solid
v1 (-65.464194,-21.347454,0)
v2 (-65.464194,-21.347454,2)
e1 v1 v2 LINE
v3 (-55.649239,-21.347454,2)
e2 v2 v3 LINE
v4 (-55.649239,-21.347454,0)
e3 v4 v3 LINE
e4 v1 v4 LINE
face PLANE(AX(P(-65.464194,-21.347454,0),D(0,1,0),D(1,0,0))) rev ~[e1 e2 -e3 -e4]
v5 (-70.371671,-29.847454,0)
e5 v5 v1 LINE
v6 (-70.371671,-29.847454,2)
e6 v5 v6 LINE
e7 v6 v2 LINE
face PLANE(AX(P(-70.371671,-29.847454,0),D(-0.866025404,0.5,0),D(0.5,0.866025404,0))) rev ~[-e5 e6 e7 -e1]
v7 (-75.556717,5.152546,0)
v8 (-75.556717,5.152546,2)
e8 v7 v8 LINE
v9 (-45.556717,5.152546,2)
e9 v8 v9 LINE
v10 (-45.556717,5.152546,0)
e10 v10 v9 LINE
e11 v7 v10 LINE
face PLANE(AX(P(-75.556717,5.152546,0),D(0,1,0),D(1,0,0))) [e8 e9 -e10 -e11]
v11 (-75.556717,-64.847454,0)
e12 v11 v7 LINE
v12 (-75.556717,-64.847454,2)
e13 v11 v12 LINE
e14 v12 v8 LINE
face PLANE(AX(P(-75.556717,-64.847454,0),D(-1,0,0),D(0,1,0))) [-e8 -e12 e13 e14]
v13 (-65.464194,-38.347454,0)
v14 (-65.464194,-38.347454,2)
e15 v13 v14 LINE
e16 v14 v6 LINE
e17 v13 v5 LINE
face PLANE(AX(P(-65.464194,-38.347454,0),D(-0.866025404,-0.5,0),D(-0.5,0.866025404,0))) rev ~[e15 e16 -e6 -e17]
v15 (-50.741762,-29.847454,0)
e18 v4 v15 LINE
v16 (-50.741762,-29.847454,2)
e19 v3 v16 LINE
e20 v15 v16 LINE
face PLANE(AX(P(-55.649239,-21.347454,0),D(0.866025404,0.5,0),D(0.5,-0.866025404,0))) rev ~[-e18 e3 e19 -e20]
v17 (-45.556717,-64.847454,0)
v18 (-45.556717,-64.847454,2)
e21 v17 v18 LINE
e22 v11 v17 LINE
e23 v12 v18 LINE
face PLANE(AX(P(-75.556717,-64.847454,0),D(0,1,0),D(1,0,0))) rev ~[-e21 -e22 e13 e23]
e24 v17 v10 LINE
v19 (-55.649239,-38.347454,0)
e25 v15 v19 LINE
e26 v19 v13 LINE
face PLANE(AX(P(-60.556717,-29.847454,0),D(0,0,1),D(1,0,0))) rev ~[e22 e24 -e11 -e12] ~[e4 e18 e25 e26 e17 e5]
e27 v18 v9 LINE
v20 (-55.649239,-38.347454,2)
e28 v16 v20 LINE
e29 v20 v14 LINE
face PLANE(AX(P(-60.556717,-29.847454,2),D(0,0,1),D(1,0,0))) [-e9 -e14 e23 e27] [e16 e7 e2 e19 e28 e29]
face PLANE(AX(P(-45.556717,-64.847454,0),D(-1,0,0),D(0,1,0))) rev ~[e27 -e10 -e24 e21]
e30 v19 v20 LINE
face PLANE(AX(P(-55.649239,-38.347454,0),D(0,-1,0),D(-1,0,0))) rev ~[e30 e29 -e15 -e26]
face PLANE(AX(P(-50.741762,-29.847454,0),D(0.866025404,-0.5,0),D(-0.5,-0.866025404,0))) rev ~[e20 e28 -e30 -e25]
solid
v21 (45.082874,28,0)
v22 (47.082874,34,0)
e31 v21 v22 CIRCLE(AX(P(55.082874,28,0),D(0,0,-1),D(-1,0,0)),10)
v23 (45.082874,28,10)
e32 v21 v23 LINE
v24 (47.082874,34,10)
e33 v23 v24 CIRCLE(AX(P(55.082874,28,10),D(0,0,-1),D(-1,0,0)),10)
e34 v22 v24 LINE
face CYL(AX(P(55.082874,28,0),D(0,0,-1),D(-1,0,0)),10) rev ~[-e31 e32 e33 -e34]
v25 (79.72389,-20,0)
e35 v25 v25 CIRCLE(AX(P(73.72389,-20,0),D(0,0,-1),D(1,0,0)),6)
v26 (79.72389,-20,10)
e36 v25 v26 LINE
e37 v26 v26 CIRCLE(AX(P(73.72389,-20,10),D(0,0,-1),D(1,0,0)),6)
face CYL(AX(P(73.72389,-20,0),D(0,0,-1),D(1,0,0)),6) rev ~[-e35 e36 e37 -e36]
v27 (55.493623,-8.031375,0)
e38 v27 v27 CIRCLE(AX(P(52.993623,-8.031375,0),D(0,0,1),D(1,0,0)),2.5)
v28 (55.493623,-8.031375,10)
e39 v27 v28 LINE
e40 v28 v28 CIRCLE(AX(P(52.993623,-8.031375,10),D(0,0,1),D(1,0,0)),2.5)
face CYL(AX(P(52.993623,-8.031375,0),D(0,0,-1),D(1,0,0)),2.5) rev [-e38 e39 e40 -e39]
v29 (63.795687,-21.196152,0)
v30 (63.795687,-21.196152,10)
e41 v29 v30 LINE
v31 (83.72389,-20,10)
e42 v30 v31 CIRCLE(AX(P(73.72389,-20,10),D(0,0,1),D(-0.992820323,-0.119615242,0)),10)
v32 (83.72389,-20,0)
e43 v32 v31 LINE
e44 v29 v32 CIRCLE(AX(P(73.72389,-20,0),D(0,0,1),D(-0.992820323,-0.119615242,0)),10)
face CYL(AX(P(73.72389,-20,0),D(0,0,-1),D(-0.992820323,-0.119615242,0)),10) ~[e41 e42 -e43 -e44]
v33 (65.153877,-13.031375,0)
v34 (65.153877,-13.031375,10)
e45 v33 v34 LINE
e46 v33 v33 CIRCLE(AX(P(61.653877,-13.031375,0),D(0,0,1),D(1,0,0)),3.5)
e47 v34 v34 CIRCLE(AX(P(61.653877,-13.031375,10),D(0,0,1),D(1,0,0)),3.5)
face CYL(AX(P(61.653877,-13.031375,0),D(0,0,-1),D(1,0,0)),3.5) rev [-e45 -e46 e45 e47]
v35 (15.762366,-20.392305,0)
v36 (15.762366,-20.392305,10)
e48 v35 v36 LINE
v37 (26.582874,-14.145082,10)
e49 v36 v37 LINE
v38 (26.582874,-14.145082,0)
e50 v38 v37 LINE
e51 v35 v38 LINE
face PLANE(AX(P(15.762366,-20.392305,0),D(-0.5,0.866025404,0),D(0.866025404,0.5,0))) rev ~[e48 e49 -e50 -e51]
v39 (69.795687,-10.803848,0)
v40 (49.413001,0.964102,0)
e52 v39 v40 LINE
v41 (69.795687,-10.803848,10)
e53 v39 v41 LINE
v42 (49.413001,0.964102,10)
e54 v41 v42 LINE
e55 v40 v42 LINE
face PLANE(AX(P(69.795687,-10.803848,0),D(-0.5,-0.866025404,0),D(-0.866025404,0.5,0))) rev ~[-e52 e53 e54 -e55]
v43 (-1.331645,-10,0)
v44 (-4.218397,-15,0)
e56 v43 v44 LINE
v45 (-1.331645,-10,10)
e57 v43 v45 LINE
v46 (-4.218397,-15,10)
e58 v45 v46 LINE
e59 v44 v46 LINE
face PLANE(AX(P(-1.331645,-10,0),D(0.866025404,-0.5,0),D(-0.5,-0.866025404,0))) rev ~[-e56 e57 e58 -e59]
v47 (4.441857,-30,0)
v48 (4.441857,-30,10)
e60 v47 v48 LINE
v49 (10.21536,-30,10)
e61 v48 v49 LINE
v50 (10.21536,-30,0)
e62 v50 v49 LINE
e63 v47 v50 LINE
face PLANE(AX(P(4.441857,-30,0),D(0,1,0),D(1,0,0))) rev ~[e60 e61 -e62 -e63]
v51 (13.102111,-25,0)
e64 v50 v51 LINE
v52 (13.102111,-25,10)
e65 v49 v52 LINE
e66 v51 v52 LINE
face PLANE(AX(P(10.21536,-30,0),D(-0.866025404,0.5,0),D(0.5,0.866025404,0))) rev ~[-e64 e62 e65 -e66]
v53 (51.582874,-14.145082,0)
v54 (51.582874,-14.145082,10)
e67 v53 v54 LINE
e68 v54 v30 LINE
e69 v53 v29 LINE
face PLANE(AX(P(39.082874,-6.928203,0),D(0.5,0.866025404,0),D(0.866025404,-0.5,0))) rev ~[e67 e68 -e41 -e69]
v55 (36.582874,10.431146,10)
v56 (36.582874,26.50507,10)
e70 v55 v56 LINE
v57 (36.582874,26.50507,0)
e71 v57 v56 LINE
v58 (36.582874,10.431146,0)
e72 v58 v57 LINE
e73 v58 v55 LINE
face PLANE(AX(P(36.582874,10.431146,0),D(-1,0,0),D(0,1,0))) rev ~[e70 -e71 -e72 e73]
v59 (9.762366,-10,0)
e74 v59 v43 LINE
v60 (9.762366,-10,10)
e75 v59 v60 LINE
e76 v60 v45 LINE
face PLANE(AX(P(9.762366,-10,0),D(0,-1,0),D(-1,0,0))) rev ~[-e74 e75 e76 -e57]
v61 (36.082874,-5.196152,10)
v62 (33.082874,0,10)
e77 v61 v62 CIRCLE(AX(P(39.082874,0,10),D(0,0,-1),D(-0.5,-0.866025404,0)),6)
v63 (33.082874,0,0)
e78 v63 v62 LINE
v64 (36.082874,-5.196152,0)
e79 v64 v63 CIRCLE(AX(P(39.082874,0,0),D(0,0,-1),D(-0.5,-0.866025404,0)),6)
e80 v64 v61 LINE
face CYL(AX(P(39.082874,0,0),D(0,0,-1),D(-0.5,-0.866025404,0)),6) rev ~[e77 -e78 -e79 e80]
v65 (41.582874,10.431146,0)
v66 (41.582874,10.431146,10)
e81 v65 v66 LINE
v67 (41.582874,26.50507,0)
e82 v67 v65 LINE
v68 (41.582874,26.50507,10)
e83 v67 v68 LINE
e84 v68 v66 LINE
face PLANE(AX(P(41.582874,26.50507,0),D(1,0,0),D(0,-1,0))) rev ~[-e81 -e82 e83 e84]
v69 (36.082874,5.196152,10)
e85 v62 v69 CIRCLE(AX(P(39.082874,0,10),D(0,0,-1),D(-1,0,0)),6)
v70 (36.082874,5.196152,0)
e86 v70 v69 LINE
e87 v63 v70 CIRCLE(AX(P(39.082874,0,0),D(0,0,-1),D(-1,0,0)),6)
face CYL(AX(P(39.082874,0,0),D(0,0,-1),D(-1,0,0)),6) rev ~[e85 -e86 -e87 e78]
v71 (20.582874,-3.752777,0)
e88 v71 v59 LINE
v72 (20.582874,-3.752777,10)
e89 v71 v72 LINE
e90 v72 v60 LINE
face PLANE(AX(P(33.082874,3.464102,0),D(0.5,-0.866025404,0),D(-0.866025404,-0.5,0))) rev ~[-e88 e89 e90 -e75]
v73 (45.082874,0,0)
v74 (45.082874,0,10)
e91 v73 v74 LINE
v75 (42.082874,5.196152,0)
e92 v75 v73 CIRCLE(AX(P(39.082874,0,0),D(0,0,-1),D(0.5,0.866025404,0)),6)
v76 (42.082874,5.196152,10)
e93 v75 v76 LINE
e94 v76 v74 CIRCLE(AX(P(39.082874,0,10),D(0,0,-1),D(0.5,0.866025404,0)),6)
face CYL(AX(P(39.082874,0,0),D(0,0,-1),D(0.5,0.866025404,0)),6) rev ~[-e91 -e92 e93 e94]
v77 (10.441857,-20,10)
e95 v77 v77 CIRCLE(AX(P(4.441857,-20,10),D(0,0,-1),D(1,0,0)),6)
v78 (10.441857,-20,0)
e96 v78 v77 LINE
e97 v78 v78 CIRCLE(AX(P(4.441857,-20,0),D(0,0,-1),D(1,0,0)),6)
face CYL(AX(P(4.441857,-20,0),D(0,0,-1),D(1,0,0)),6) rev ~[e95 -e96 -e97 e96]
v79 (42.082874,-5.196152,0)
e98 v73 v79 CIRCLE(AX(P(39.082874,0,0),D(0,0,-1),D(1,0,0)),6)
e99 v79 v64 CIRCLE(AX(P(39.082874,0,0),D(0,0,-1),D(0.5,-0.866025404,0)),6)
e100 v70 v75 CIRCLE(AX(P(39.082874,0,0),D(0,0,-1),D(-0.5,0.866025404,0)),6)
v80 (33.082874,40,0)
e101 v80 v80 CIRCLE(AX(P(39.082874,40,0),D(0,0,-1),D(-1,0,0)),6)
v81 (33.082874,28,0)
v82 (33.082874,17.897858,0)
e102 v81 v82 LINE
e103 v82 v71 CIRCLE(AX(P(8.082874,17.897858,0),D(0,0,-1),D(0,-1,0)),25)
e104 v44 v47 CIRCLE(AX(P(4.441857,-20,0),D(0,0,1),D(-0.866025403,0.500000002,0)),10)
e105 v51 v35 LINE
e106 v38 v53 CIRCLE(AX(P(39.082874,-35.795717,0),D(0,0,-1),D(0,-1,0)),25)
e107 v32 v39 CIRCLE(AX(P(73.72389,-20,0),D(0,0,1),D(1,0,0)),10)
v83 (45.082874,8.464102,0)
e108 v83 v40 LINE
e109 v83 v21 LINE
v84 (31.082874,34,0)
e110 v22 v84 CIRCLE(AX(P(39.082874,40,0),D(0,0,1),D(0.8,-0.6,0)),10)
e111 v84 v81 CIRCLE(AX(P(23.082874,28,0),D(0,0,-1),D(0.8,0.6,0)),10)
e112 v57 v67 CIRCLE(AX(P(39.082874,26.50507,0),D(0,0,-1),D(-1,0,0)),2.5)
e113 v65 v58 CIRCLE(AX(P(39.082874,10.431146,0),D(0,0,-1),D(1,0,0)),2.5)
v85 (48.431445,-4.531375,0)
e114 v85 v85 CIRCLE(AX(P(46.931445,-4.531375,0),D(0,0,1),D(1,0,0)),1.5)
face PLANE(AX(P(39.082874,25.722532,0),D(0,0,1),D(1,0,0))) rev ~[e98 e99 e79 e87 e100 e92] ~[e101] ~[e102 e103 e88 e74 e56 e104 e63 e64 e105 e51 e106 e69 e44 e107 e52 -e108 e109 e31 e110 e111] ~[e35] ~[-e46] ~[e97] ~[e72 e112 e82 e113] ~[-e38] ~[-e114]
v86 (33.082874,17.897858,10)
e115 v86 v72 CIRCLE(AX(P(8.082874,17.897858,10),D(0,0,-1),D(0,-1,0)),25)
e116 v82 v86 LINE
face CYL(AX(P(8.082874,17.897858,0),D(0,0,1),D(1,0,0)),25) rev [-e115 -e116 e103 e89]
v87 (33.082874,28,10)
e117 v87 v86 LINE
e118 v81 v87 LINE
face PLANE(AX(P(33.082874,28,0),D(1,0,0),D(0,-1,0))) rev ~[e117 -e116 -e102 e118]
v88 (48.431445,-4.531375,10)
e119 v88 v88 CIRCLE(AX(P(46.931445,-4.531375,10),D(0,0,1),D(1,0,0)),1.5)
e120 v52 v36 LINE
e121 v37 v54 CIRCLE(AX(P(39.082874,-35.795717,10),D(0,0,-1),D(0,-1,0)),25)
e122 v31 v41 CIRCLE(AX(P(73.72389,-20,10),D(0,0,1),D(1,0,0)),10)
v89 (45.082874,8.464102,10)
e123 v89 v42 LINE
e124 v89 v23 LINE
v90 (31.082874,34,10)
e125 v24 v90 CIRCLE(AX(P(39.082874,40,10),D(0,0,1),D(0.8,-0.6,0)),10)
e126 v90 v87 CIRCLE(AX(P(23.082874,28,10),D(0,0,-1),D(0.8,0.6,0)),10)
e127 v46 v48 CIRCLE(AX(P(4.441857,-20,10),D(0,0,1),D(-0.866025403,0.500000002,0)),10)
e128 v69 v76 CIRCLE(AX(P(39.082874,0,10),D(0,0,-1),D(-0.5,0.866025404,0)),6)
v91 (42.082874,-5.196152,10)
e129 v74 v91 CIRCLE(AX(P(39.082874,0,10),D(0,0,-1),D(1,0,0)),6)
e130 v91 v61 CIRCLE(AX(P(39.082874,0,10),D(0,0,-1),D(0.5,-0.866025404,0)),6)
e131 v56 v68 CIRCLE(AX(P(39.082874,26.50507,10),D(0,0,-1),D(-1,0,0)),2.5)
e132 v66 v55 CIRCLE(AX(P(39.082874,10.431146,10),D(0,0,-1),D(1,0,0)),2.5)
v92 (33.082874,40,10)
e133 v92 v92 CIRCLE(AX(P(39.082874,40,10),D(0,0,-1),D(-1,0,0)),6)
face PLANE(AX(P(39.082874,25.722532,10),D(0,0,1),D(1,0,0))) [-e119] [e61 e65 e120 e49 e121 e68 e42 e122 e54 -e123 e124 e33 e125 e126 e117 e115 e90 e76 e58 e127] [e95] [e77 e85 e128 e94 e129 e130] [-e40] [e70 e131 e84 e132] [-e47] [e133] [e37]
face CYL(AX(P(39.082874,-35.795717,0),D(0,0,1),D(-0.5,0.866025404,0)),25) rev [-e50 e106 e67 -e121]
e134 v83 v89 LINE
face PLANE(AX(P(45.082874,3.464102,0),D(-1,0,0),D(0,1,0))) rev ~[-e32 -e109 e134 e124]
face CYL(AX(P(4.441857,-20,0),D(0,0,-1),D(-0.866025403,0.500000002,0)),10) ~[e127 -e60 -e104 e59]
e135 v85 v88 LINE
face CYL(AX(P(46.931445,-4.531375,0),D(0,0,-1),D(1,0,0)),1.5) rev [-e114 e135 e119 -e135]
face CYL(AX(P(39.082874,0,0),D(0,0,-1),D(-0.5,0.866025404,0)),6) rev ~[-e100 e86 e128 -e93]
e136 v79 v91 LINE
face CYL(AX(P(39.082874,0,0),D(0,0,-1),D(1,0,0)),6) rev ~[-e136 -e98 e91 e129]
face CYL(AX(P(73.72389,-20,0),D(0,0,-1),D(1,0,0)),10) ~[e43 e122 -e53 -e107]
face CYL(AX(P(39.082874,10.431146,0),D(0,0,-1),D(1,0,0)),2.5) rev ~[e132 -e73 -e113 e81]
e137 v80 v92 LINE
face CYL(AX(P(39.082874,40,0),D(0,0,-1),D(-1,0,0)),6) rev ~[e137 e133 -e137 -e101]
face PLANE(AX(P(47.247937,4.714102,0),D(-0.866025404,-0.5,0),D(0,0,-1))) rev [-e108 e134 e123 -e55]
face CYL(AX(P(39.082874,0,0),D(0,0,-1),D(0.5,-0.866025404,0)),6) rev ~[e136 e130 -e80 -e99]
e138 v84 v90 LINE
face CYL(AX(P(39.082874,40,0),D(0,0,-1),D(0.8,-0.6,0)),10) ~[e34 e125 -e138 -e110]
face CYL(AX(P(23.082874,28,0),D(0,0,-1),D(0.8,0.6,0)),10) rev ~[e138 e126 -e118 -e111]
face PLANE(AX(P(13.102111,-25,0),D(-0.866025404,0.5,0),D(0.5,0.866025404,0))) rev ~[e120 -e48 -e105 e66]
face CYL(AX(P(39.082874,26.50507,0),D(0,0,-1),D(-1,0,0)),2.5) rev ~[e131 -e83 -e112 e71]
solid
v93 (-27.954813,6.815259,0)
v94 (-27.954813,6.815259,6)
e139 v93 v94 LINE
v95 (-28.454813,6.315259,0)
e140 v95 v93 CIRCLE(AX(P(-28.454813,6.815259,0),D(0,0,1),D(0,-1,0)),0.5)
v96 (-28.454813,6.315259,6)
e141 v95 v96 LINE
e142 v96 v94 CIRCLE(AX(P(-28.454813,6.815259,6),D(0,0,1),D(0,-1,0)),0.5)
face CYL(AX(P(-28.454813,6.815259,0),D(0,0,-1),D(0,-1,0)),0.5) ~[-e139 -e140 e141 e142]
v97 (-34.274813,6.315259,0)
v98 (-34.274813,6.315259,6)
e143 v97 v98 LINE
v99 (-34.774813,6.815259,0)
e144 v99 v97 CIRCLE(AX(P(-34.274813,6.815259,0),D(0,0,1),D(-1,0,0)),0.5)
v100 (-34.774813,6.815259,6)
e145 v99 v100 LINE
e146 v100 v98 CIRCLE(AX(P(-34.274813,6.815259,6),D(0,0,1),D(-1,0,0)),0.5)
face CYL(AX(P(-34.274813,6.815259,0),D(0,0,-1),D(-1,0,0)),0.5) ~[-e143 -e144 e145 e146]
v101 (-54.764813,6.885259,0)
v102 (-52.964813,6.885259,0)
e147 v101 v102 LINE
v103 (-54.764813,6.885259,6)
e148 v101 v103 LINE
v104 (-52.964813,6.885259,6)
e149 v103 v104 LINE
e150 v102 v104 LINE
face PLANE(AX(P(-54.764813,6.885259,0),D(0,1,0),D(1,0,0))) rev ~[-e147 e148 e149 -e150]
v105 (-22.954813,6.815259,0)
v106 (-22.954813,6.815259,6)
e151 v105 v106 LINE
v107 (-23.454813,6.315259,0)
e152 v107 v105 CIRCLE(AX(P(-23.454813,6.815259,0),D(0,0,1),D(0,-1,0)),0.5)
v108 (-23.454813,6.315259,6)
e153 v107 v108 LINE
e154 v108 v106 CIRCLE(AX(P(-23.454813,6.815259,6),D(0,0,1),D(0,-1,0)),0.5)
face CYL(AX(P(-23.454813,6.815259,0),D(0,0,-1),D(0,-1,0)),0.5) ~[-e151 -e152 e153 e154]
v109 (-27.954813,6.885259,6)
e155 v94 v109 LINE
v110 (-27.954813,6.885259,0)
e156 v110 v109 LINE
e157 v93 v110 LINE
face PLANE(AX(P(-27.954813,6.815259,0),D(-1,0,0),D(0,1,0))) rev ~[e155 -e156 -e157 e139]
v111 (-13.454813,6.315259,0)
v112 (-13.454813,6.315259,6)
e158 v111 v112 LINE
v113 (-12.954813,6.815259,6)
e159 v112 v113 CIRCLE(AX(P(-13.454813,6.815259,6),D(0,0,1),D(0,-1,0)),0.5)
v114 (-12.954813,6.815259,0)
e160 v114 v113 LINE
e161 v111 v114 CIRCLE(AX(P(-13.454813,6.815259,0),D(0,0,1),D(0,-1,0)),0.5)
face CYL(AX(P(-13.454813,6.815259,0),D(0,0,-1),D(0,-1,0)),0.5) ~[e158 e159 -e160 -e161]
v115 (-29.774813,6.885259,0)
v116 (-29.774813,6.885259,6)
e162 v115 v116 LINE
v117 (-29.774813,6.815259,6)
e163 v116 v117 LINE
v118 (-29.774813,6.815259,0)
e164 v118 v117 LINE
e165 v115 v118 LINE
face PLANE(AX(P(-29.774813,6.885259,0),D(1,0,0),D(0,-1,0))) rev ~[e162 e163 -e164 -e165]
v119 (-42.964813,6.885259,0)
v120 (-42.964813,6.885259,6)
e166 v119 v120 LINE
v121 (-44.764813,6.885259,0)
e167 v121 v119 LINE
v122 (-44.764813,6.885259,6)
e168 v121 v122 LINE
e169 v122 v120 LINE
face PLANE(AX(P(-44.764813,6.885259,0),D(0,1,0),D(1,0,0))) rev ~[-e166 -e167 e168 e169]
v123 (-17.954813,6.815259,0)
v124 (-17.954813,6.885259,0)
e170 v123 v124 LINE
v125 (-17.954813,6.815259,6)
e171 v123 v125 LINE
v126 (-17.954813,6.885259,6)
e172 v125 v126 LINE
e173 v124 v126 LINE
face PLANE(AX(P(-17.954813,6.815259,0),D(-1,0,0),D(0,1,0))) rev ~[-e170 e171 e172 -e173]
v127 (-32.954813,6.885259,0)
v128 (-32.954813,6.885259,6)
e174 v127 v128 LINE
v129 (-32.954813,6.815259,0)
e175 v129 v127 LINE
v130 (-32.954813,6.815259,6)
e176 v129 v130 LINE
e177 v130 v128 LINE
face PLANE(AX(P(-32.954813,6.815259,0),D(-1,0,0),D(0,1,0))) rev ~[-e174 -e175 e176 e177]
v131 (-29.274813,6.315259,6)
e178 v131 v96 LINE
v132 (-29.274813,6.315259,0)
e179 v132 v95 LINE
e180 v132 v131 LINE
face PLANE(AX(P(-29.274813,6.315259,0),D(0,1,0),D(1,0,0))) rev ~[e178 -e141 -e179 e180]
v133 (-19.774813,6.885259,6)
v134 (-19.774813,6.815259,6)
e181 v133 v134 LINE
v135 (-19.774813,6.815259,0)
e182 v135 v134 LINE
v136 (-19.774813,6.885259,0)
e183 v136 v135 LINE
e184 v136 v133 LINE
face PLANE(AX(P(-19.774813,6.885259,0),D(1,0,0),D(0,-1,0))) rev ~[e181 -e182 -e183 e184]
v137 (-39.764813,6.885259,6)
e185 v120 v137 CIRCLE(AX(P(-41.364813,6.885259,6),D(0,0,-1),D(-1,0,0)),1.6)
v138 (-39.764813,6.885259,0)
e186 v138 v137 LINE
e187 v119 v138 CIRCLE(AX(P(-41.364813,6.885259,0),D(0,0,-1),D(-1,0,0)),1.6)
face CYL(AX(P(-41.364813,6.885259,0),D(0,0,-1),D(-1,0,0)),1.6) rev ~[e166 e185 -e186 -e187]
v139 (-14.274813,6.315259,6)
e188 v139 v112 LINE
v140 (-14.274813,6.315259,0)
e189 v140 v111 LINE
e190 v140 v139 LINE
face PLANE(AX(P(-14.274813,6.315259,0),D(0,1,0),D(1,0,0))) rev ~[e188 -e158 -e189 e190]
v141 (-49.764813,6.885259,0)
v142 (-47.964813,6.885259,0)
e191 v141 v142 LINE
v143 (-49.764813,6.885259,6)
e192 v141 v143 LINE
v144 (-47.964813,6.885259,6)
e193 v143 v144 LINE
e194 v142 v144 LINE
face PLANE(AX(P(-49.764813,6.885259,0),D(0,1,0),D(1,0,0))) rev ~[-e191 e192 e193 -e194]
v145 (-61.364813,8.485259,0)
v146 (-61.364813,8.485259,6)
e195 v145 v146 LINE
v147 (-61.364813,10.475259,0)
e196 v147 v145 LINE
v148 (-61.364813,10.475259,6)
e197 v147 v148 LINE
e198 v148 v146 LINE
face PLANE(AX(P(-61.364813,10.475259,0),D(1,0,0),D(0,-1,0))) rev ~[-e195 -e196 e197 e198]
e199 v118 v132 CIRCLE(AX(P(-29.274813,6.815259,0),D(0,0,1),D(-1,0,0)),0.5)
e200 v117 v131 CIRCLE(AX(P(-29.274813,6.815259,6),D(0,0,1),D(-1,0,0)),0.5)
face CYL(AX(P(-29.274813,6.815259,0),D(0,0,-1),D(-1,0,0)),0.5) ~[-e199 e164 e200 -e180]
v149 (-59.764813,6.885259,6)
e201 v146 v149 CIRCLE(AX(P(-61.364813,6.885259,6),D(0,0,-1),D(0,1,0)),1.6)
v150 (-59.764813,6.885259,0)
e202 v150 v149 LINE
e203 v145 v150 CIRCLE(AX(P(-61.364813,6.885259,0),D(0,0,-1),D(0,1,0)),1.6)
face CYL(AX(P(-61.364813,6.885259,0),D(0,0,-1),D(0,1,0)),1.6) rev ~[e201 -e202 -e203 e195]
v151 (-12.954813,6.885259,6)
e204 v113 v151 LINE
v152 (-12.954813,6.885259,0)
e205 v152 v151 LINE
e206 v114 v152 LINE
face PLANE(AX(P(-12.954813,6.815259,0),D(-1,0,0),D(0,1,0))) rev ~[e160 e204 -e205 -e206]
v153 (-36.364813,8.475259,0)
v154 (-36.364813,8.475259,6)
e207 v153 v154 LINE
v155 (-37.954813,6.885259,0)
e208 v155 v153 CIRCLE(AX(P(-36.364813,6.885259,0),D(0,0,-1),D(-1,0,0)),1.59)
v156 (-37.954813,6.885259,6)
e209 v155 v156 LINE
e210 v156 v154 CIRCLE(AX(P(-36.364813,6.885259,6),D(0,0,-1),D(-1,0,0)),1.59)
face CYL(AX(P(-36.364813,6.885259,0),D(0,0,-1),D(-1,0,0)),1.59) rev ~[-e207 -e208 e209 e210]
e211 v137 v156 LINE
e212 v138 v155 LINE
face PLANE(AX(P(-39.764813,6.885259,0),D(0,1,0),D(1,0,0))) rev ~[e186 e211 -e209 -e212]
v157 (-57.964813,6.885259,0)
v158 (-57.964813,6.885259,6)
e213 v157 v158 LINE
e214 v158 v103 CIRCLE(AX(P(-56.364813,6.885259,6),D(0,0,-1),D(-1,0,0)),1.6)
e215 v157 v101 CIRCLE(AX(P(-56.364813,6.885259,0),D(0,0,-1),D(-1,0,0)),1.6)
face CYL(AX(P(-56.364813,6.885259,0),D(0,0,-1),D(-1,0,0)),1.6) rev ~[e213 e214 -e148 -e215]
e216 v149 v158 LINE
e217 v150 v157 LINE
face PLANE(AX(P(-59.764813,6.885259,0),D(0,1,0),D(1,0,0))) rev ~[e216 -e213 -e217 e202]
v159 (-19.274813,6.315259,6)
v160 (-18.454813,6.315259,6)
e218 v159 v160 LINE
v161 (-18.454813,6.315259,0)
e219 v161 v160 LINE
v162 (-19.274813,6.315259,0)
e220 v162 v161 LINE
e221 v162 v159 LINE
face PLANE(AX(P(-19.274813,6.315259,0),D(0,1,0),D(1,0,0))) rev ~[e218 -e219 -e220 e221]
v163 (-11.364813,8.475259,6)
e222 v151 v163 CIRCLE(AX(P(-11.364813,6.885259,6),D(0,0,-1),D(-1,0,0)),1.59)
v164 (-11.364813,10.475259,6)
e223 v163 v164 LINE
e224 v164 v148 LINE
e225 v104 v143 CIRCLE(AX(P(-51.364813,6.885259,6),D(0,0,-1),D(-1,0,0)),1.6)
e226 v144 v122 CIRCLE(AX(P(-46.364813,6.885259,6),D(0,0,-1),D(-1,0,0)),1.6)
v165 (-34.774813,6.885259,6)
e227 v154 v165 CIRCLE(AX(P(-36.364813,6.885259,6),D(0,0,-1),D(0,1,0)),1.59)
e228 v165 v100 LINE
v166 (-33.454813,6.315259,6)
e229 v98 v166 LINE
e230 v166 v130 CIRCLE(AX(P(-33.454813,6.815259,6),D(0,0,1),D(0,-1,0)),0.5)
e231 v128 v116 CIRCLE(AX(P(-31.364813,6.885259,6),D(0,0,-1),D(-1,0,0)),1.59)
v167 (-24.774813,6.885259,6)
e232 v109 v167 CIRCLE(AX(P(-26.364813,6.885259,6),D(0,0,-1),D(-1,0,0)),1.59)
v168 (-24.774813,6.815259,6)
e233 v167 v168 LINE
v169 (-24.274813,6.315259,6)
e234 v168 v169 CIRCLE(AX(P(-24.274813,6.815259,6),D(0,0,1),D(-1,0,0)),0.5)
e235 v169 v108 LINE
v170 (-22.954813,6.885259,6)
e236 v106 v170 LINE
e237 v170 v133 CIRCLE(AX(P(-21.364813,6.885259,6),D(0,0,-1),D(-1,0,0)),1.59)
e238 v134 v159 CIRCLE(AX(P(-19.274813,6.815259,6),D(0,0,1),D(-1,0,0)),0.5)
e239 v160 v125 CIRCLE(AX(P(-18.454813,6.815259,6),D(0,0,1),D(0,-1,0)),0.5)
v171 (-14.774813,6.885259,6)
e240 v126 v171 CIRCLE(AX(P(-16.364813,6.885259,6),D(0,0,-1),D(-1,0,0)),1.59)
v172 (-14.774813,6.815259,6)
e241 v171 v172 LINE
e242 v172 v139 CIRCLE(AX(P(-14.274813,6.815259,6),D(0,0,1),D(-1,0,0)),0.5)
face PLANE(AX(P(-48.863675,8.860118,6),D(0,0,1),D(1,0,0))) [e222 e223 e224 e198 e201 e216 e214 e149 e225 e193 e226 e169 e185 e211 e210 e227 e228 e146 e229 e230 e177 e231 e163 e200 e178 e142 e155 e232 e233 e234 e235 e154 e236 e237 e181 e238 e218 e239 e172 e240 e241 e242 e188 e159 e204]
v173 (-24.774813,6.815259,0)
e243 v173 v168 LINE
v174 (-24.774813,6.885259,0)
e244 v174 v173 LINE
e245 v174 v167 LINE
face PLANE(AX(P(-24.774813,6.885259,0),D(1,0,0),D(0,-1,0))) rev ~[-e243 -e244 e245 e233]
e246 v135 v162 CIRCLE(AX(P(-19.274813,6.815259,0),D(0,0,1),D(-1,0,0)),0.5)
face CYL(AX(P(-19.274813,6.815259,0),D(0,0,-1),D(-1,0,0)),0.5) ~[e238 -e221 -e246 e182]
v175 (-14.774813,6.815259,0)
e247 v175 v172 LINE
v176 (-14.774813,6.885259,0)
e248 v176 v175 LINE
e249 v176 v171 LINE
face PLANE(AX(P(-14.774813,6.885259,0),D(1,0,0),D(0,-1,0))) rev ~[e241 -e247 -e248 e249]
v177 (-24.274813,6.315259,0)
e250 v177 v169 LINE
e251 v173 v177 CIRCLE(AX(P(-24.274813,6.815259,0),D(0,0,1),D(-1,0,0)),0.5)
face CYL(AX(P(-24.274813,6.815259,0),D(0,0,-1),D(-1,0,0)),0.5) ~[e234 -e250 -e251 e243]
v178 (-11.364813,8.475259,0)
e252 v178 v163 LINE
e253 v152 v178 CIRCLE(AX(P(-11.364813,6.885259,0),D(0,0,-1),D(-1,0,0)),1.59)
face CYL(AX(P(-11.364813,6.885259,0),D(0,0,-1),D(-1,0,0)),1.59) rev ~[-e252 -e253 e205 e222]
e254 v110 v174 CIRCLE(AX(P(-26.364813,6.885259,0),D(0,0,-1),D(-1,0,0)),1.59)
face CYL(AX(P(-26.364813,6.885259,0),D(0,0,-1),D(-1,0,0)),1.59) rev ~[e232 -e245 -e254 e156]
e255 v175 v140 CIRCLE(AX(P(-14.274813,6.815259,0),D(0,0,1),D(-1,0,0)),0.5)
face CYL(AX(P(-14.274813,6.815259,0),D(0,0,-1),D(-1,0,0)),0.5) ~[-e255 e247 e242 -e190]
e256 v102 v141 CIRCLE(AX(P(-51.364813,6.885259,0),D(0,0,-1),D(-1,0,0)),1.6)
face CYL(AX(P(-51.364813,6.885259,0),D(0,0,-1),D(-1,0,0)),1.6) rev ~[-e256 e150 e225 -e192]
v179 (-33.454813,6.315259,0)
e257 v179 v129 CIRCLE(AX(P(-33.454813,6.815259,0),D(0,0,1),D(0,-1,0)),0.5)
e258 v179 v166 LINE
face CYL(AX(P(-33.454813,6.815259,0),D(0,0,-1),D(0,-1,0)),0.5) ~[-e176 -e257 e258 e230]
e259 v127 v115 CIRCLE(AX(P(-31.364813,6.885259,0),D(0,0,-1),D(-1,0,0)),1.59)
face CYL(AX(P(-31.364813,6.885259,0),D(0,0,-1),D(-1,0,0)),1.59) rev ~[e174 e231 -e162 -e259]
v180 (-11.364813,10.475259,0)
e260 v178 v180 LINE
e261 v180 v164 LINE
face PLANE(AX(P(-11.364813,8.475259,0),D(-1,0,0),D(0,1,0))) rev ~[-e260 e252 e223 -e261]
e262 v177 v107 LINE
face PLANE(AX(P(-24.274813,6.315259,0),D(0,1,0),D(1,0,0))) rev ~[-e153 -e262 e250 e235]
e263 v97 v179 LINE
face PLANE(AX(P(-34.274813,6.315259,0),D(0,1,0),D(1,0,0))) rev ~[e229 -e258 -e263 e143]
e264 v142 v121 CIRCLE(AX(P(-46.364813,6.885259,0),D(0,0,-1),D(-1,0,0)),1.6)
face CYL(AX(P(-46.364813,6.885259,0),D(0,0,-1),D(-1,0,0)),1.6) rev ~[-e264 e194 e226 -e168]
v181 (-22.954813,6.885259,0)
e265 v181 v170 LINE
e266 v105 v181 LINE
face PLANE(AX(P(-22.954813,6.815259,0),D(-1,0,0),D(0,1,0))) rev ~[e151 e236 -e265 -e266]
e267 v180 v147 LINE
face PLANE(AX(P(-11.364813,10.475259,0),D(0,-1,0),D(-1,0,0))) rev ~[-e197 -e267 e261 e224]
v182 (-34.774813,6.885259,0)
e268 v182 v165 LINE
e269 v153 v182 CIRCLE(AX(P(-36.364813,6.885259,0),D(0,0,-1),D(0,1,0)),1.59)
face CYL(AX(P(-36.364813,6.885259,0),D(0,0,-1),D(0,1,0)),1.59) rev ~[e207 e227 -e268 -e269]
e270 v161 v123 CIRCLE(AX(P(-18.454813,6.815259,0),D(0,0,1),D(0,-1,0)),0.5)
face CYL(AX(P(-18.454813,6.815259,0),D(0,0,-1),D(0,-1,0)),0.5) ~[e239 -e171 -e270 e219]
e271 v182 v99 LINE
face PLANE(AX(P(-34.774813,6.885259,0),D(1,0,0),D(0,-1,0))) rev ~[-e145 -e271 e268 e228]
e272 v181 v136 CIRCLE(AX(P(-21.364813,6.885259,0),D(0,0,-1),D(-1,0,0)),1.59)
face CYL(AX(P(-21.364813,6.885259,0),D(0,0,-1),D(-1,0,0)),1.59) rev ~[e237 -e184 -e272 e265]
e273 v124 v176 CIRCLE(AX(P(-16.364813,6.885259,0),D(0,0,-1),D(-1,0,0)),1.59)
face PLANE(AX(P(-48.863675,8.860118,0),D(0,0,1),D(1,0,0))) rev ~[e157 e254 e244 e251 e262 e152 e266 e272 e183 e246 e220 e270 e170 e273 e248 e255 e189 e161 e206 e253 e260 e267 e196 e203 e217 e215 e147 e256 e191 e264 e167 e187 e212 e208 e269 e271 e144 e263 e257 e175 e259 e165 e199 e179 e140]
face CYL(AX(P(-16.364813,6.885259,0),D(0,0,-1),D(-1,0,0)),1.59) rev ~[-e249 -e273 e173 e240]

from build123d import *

# Parameters (mm, degrees)
F1_DEPTH = 6
F2_R     = 2.5
F2_R_2   = 3.5
F2_R_3   = 1.5
F3_DEPTH = 10
F4_R     = 25
F5_SIZE  = 5
F2_W     = 30
F2_H     = 70
F6_DEPTH = 2


# Not quite as in the source:
# - a feature names something its author has since deleted; it is built from what else it names


with BuildPart() as f1:
    # F0 (on Top) → F1 (new body)
    with BuildSketch(Plane.XY):
        with BuildLine():
            Line((-39.7648132003, 6.8852591163), (-37.9548132003, 6.8852591163))
            ThreePointArc((-37.9548132003, 6.8852591163), (-37.4891129824, 8.0095588984), (-36.3648132003, 8.4752591163))
            Line((-36.3648132003, 8.4752591163), (-36.3648132003, 10.4752591163))
            Line((-36.3648132003, 10.4752591163), (-61.3648132003, 10.4752591163))
            Line((-61.3648132003, 10.4752591163), (-61.3648132003, 8.4852591163))
            ThreePointArc((-61.3648132003, 8.4852591163), (-60.2334423504, 8.0166299662), (-59.7648132003, 6.8852591163))
            Line((-59.7648132003, 6.8852591163), (-57.9648132003, 6.8852591163))
            ThreePointArc((-57.9648132003, 6.8852591163), (-56.3648132003, 8.4852591163), (-54.7648132003, 6.8852591163))
            Line((-54.7648132003, 6.8852591163), (-52.9648132003, 6.8852591163))
            ThreePointArc((-52.9648132003, 6.8852591163), (-51.3648132003, 8.4852591163), (-49.7648132003, 6.8852591163))
            Line((-49.7648132003, 6.8852591163), (-47.9648132003, 6.8852591163))
            ThreePointArc((-47.9648132003, 6.8852591163), (-46.3648132003, 8.4852591163), (-44.7648132003, 6.8852591163))
            Line((-44.7648132003, 6.8852591163), (-42.9648132003, 6.8852591163))
            ThreePointArc((-42.9648132003, 6.8852591163), (-41.3648132003, 8.4852591163), (-39.7648132003, 6.8852591163))
        make_face()
        with BuildLine():
            Line((-36.3648132003, 10.4752591163), (-36.3648132003, 8.4752591163))
            ThreePointArc((-36.3648132003, 8.4752591163), (-35.2405134182, 8.0095588984), (-34.7748132003, 6.8852591163))
            Line((-34.7748132003, 6.8852591163), (-34.7748132003, 6.8152591163))
            ThreePointArc((-34.7748132003, 6.8152591163), (-34.6283665909, 6.4617057257), (-34.2748132003, 6.3152591163))
            Line((-34.2748132003, 6.3152591163), (-33.9548132003, 6.3152591163))
            Line((-33.9548132003, 6.3152591163), (-33.4548132003, 6.3152591163))
            ThreePointArc((-33.4548132003, 6.3152591163), (-33.1012598097, 6.4617057257), (-32.9548132003, 6.8152591163))
            Line((-32.9548132003, 6.8152591163), (-32.9548132003, 6.8852591163))
            ThreePointArc((-32.9548132003, 6.8852591163), (-31.3648132003, 8.4752591163), (-29.7748132003, 6.8852591163))
            Line((-29.7748132003, 6.8852591163), (-29.7748132003, 6.8152591163))
            ThreePointArc((-29.7748132003, 6.8152591163), (-29.6283665909, 6.4617057257), (-29.2748132003, 6.3152591163))
            Line((-29.2748132003, 6.3152591163), (-28.9548132003, 6.3152591163))
            Line((-28.9548132003, 6.3152591163), (-28.4548132003, 6.3152591163))
            ThreePointArc((-28.4548132003, 6.3152591163), (-28.1012598097, 6.4617057257), (-27.9548132003, 6.8152591163))
            Line((-27.9548132003, 6.8152591163), (-27.9548132003, 6.8852591163))
            ThreePointArc((-27.9548132003, 6.8852591163), (-26.3648132003, 8.4752591163), (-24.7748132003, 6.8852591163))
            Line((-24.7748132003, 6.8852591163), (-24.7748132003, 6.8152591163))
            ThreePointArc((-24.7748132003, 6.8152591163), (-24.6283665909, 6.4617057257), (-24.2748132003, 6.3152591163))
            Line((-24.2748132003, 6.3152591163), (-23.9548132003, 6.3152591163))
            Line((-23.9548132003, 6.3152591163), (-23.4548132003, 6.3152591163))
            ThreePointArc((-23.4548132003, 6.3152591163), (-23.1012598097, 6.4617057257), (-22.9548132003, 6.8152591163))
            Line((-22.9548132003, 6.8152591163), (-22.9548132003, 6.8852591163))
            ThreePointArc((-22.9548132003, 6.8852591163), (-21.3648132003, 8.4752591163), (-19.7748132003, 6.8852591163))
            Line((-19.7748132003, 6.8852591163), (-19.7748132003, 6.8152591163))
            ThreePointArc((-19.7748132003, 6.8152591163), (-19.6283665909, 6.4617057257), (-19.2748132003, 6.3152591163))
            Line((-19.2748132003, 6.3152591163), (-18.9548132003, 6.3152591163))
            Line((-18.9548132003, 6.3152591163), (-18.4548132003, 6.3152591163))
            ThreePointArc((-18.4548132003, 6.3152591163), (-18.1012598097, 6.4617057257), (-17.9548132003, 6.8152591163))
            Line((-17.9548132003, 6.8152591163), (-17.9548132003, 6.8852591163))
            ThreePointArc((-17.9548132003, 6.8852591163), (-16.3648132003, 8.4752591163), (-14.7748132003, 6.8852591163))
            Line((-14.7748132003, 6.8852591163), (-14.7748132003, 6.8152591163))
            ThreePointArc((-14.7748132003, 6.8152591163), (-14.6283665909, 6.4617057257), (-14.2748132003, 6.3152591163))
            Line((-14.2748132003, 6.3152591163), (-13.9548132003, 6.3152591163))
            Line((-13.9548132003, 6.3152591163), (-13.4548132003, 6.3152591163))
            ThreePointArc((-13.4548132003, 6.3152591163), (-13.1012598097, 6.4617057257), (-12.9548132003, 6.8152591163))
            Line((-12.9548132003, 6.8152591163), (-12.9548132003, 6.8852591163))
            ThreePointArc((-12.9548132003, 6.8852591163), (-12.4891129824, 8.0095588984), (-11.3648132003, 8.4752591163))
            Line((-11.3648132003, 8.4752591163), (-11.3648132003, 10.4752591163))
            Line((-11.3648132003, 10.4752591163), (-36.3648132003, 10.4752591163))
        make_face()
    extrude(amount=F1_DEPTH)


with BuildPart() as f3:
    # F2 (on Top) → F3 (new body)
    with BuildSketch(Plane.XY):
        with BuildLine():
            ThreePointArc((36.0828736126, 5.1961524227), (39.0828736126, 6), (42.0828736126, 5.1961524227))
            Line((42.0828736126, 5.1961524227), (45.0828736126, 3.4641016151))
            Line((45.0828736126, 3.4641016151), (45.0828736126, 28))
            ThreePointArc((45.0828736126, 28), (45.5960406321, 31.1622776602), (47.0828736126, 34))
            ThreePointArc((47.0828736126, 34), (39.0828736126, 50), (31.0828736126, 34))
            ThreePointArc((31.0828736126, 34), (32.5697065931, 31.1622776602), (33.0828736126, 28))
            Line((33.0828736126, 28), (33.0828736126, 3.4641016151))
            Line((33.0828736126, 3.4641016151), (36.0828736126, 5.1961524227))
        make_face()
        with BuildLine():
            Line((41.5828736126, 26.5050698072), (41.5828736126, 10.4311462492))
            ThreePointArc((41.5828736126, 10.4311462492), (39.0828736126, 7.9311462492), (36.5828736126, 10.4311462492))
            Line((36.5828736126, 10.4311462492), (36.5828736126, 26.5050698072))
            ThreePointArc((36.5828736126, 26.5050698072), (39.0828736126, 29.0050698072), (41.5828736126, 26.5050698072))
        make_face(mode=Mode.SUBTRACT)
        with BuildLine():
            ThreePointArc((45.0828736126, 40), (39.0828736126, 34), (33.0828736126, 40))
            ThreePointArc((33.0828736126, 40), (39.0828736126, 46), (45.0828736126, 40))
        make_face(mode=Mode.SUBTRACT)
        with BuildLine():
            ThreePointArc((36.0828736126, -5.1961524227), (33.8867211899, -3), (33.0828736126, 0))
            Line((33.0828736126, 0), (33.0828736126, 3.4641016151))
            Line((33.0828736126, 3.4641016151), (9.762365537, -10))
            Line((9.762365537, -10), (10.2153601532, -10))
            Line((10.2153601532, -10), (13.1021114244, -14.9999998707))
            Line((13.1021114244, -14.9999998707), (15.9888628451, -20))
            Line((15.9888628451, -20), (15.762365537, -20.3923048454))
            Line((15.762365537, -20.3923048454), (39.0828736126, -6.9282032303))
            Line((39.0828736126, -6.9282032303), (36.0828736126, -5.1961524227))
        make_face()
        with BuildLine():
            Line((7.4418574613, -25.1961524227), (14.3700606915, -21.1961524227))
            ThreePointArc((14.3700606915, -21.1961524227), (14.4238921312, -20.5991526088), (14.4418574613, -20))
            ThreePointArc((14.4418574613, -20), (14.1011157048, -17.4118094768), (13.1021114244, -14.9999998707))
            ThreePointArc((13.1021114244, -14.9999998707), (11.0765569379, -12.5179706727), (8.3700606915, -10.8038475773))
            Line((8.3700606915, -10.8038475773), (1.4418574613, -14.8038475773))
            ThreePointArc((1.4418574613, -14.8038475773), (7.4418574613, -14.8038475773), (10.4418574613, -20))
            ThreePointArc((10.4418574613, -20), (9.638009884, -23), (7.4418574613, -25.1961524227))
        make_face()
        with BuildLine():
            ThreePointArc((13.1021114676, -25.0000000546), (13.9286904318, -23.1622776901), (14.3700606915, -21.1961524227))
            Line((14.3700606915, -21.1961524227), (7.4418574613, -25.1961524227))
            ThreePointArc((7.4418574613, -25.1961524227), (-0.7542949614, -23), (1.4418574613, -14.8038475773))
            Line((1.4418574613, -14.8038475773), (8.3700606915, -10.8038475773))
            ThreePointArc((8.3700606915, -10.8038475773), (6.446661164, -10.2030228073), (4.4418574613, -10))
            ThreePointArc((4.4418574613, -10), (-0.5581425291, -11.3397459566), (-4.2183965654, -14.9999999807))
            ThreePointArc((-4.2183965654, -14.9999999807), (-5.5581425387, -19.9999998376), (-4.2183967279, -24.9999997379))
            ThreePointArc((-4.2183967279, -24.9999997379), (-0.5581426698, -28.6602539622), (4.4418574613, -30))
            ThreePointArc((4.4418574613, -30), (9.441857434, -28.6602540536), (13.1021114676, -25.0000000546))
        make_face()
        with BuildLine():
            Line((45.0828736126, 3.4641016151), (45.0828736126, 0))
            ThreePointArc((45.0828736126, 0), (44.2790260353, -3), (42.0828736126, -5.1961524227))
            Line((42.0828736126, -5.1961524227), (39.0828736126, -6.9282032303))
            Line((39.0828736126, -6.9282032303), (63.7956865337, -21.1961524227))
            ThreePointArc((63.7956865337, -21.1961524227), (65.0636357262, -15), (69.7956865337, -10.8038475773))
            Line((69.7956865337, -10.8038475773), (45.0828736126, 3.4641016151))
        make_face()
        with Locations((52.9936231899, -8.0313750131)):
            Circle(F2_R, mode=Mode.SUBTRACT)
        with Locations((61.6538772277, -13.0313750131)):
            Circle(F2_R_2, mode=Mode.SUBTRACT)
        with Locations((46.9314453634, -4.5313750131)):
            Circle(F2_R_3, mode=Mode.SUBTRACT)
        with BuildLine():
            ThreePointArc((83.723889764, -20), (79.2337884789, -11.6548806988), (69.7956865337, -10.8038475773))
            Line((69.7956865337, -10.8038475773), (76.723889764, -14.8038475773))
            ThreePointArc((76.723889764, -14.8038475773), (78.9200421867, -17), (79.723889764, -20))
            ThreePointArc((79.723889764, -20), (76.723889764, -25.1961524227), (70.723889764, -25.1961524227))
            Line((70.723889764, -25.1961524227), (63.7956865337, -21.1961524227))
            ThreePointArc((63.7956865337, -21.1961524227), (74.3230423728, -29.9820346699), (83.723889764, -20))
        make_face()
        with BuildLine():
            Line((76.723889764, -14.8038475773), (69.7956865337, -10.8038475773))
            ThreePointArc((69.7956865337, -10.8038475773), (65.0636357262, -15), (63.7956865337, -21.1961524227))
            Line((63.7956865337, -21.1961524227), (70.723889764, -25.1961524227))
            ThreePointArc((70.723889764, -25.1961524227), (68.5277373413, -17), (76.723889764, -14.8038475773))
        make_face()
        with BuildLine():
            Line((39.0828736126, -6.9282032303), (42.0828736126, -5.1961524227))
            ThreePointArc((42.0828736126, -5.1961524227), (39.0828736126, -6), (36.0828736126, -5.1961524227))
            Line((36.0828736126, -5.1961524227), (39.0828736126, -6.9282032303))
        make_face()
        with BuildLine():
            Line((33.0828736126, 3.4641016151), (33.0828736126, 0))
            ThreePointArc((33.0828736126, 0), (33.8867211899, 3), (36.0828736126, 5.1961524227))
            Line((36.0828736126, 5.1961524227), (33.0828736126, 3.4641016151))
        make_face()
        with BuildLine():
            ThreePointArc((42.0828736126, 5.1961524227), (44.2790260353, 3), (45.0828736126, 0))
            Line((45.0828736126, 0), (45.0828736126, 3.4641016151))
            Line((45.0828736126, 3.4641016151), (42.0828736126, 5.1961524227))
        make_face()
        with BuildLine():
            Line((10.2153601532, -10), (9.762365537, -10))
            Line((9.762365537, -10), (8.3700606915, -10.8038475773))
            ThreePointArc((8.3700606915, -10.8038475773), (11.0765569379, -12.5179706727), (13.1021114244, -14.9999998707))
            Line((13.1021114244, -14.9999998707), (10.2153601532, -10))
        make_face()
        with BuildLine():
            Line((8.3700606915, -10.8038475773), (9.762365537, -10))
            Line((9.762365537, -10), (4.4418574613, -10))
            ThreePointArc((4.4418574613, -10), (6.446661164, -10.2030228073), (8.3700606915, -10.8038475773))
        make_face()
        with BuildLine():
            ThreePointArc((-4.2183965654, -14.9999999807), (-0.5581425291, -11.3397459566), (4.4418574613, -10))
            Line((4.4418574613, -10), (-1.3316452306, -10))
            Line((-1.3316452306, -10), (-4.2183965654, -14.9999999807))
        make_face()
        with BuildLine():
            Line((14.3700606915, -21.1961524227), (15.762365537, -20.3923048454))
            Line((15.762365537, -20.3923048454), (15.9888628451, -20))
            Line((15.9888628451, -20), (13.1021114244, -14.9999998707))
            ThreePointArc((13.1021114244, -14.9999998707), (14.1011157048, -17.4118094768), (14.4418574613, -20))
            ThreePointArc((14.4418574613, -20), (14.4238921312, -20.5991526088), (14.3700606915, -21.1961524227))
        make_face()
        with BuildLine():
            Line((13.1021114676, -25.0000000546), (15.762365537, -20.3923048454))
            Line((15.762365537, -20.3923048454), (14.3700606915, -21.1961524227))
            ThreePointArc((14.3700606915, -21.1961524227), (13.9286904318, -23.1622776901), (13.1021114676, -25.0000000546))
        make_face()
        with BuildLine():
            Line((10.2153601532, -30), (13.1021114676, -25.0000000546))
            ThreePointArc((13.1021114676, -25.0000000546), (9.441857434, -28.6602540536), (4.4418574613, -30))
            Line((4.4418574613, -30), (10.2153601532, -30))
        make_face()
    extrude(amount=F3_DEPTH)

    # F4
    f4_edges = [f3.edges().sort_by_distance(p)[0] for p in [
        (33.082874, 3.464102, 5),
        (39.082874, -6.928203, 5),
    ]]
    fillet(f4_edges, radius=F4_R)

    # F5
    f5_edges = [f3.edges().sort_by_distance(p)[0] for p in [
        (45.082874, 3.464102, 5),
    ]]
    chamfer(f5_edges, length=F5_SIZE)


with BuildPart() as f6:
    # F2 (on Top) → F6 (new body)
    with BuildSketch(Plane.XY):
        with Locations((-60.5567166209, -29.8474544287)):
            Rectangle(F2_W, F2_H)
        Polygon((-70.3716711971, -29.8474544287), (-65.464193909, -21.3474544287), (-55.6492393328, -21.3474544287), (-50.7417620447, -29.8474544287), (-55.6492393328, -38.3474544287), (-65.464193909, -38.3474544287), align=None, mode=Mode.SUBTRACT)
    extrude(amount=F6_DEPTH)


solid = Compound([f1.part, f3.part, f6.part])
